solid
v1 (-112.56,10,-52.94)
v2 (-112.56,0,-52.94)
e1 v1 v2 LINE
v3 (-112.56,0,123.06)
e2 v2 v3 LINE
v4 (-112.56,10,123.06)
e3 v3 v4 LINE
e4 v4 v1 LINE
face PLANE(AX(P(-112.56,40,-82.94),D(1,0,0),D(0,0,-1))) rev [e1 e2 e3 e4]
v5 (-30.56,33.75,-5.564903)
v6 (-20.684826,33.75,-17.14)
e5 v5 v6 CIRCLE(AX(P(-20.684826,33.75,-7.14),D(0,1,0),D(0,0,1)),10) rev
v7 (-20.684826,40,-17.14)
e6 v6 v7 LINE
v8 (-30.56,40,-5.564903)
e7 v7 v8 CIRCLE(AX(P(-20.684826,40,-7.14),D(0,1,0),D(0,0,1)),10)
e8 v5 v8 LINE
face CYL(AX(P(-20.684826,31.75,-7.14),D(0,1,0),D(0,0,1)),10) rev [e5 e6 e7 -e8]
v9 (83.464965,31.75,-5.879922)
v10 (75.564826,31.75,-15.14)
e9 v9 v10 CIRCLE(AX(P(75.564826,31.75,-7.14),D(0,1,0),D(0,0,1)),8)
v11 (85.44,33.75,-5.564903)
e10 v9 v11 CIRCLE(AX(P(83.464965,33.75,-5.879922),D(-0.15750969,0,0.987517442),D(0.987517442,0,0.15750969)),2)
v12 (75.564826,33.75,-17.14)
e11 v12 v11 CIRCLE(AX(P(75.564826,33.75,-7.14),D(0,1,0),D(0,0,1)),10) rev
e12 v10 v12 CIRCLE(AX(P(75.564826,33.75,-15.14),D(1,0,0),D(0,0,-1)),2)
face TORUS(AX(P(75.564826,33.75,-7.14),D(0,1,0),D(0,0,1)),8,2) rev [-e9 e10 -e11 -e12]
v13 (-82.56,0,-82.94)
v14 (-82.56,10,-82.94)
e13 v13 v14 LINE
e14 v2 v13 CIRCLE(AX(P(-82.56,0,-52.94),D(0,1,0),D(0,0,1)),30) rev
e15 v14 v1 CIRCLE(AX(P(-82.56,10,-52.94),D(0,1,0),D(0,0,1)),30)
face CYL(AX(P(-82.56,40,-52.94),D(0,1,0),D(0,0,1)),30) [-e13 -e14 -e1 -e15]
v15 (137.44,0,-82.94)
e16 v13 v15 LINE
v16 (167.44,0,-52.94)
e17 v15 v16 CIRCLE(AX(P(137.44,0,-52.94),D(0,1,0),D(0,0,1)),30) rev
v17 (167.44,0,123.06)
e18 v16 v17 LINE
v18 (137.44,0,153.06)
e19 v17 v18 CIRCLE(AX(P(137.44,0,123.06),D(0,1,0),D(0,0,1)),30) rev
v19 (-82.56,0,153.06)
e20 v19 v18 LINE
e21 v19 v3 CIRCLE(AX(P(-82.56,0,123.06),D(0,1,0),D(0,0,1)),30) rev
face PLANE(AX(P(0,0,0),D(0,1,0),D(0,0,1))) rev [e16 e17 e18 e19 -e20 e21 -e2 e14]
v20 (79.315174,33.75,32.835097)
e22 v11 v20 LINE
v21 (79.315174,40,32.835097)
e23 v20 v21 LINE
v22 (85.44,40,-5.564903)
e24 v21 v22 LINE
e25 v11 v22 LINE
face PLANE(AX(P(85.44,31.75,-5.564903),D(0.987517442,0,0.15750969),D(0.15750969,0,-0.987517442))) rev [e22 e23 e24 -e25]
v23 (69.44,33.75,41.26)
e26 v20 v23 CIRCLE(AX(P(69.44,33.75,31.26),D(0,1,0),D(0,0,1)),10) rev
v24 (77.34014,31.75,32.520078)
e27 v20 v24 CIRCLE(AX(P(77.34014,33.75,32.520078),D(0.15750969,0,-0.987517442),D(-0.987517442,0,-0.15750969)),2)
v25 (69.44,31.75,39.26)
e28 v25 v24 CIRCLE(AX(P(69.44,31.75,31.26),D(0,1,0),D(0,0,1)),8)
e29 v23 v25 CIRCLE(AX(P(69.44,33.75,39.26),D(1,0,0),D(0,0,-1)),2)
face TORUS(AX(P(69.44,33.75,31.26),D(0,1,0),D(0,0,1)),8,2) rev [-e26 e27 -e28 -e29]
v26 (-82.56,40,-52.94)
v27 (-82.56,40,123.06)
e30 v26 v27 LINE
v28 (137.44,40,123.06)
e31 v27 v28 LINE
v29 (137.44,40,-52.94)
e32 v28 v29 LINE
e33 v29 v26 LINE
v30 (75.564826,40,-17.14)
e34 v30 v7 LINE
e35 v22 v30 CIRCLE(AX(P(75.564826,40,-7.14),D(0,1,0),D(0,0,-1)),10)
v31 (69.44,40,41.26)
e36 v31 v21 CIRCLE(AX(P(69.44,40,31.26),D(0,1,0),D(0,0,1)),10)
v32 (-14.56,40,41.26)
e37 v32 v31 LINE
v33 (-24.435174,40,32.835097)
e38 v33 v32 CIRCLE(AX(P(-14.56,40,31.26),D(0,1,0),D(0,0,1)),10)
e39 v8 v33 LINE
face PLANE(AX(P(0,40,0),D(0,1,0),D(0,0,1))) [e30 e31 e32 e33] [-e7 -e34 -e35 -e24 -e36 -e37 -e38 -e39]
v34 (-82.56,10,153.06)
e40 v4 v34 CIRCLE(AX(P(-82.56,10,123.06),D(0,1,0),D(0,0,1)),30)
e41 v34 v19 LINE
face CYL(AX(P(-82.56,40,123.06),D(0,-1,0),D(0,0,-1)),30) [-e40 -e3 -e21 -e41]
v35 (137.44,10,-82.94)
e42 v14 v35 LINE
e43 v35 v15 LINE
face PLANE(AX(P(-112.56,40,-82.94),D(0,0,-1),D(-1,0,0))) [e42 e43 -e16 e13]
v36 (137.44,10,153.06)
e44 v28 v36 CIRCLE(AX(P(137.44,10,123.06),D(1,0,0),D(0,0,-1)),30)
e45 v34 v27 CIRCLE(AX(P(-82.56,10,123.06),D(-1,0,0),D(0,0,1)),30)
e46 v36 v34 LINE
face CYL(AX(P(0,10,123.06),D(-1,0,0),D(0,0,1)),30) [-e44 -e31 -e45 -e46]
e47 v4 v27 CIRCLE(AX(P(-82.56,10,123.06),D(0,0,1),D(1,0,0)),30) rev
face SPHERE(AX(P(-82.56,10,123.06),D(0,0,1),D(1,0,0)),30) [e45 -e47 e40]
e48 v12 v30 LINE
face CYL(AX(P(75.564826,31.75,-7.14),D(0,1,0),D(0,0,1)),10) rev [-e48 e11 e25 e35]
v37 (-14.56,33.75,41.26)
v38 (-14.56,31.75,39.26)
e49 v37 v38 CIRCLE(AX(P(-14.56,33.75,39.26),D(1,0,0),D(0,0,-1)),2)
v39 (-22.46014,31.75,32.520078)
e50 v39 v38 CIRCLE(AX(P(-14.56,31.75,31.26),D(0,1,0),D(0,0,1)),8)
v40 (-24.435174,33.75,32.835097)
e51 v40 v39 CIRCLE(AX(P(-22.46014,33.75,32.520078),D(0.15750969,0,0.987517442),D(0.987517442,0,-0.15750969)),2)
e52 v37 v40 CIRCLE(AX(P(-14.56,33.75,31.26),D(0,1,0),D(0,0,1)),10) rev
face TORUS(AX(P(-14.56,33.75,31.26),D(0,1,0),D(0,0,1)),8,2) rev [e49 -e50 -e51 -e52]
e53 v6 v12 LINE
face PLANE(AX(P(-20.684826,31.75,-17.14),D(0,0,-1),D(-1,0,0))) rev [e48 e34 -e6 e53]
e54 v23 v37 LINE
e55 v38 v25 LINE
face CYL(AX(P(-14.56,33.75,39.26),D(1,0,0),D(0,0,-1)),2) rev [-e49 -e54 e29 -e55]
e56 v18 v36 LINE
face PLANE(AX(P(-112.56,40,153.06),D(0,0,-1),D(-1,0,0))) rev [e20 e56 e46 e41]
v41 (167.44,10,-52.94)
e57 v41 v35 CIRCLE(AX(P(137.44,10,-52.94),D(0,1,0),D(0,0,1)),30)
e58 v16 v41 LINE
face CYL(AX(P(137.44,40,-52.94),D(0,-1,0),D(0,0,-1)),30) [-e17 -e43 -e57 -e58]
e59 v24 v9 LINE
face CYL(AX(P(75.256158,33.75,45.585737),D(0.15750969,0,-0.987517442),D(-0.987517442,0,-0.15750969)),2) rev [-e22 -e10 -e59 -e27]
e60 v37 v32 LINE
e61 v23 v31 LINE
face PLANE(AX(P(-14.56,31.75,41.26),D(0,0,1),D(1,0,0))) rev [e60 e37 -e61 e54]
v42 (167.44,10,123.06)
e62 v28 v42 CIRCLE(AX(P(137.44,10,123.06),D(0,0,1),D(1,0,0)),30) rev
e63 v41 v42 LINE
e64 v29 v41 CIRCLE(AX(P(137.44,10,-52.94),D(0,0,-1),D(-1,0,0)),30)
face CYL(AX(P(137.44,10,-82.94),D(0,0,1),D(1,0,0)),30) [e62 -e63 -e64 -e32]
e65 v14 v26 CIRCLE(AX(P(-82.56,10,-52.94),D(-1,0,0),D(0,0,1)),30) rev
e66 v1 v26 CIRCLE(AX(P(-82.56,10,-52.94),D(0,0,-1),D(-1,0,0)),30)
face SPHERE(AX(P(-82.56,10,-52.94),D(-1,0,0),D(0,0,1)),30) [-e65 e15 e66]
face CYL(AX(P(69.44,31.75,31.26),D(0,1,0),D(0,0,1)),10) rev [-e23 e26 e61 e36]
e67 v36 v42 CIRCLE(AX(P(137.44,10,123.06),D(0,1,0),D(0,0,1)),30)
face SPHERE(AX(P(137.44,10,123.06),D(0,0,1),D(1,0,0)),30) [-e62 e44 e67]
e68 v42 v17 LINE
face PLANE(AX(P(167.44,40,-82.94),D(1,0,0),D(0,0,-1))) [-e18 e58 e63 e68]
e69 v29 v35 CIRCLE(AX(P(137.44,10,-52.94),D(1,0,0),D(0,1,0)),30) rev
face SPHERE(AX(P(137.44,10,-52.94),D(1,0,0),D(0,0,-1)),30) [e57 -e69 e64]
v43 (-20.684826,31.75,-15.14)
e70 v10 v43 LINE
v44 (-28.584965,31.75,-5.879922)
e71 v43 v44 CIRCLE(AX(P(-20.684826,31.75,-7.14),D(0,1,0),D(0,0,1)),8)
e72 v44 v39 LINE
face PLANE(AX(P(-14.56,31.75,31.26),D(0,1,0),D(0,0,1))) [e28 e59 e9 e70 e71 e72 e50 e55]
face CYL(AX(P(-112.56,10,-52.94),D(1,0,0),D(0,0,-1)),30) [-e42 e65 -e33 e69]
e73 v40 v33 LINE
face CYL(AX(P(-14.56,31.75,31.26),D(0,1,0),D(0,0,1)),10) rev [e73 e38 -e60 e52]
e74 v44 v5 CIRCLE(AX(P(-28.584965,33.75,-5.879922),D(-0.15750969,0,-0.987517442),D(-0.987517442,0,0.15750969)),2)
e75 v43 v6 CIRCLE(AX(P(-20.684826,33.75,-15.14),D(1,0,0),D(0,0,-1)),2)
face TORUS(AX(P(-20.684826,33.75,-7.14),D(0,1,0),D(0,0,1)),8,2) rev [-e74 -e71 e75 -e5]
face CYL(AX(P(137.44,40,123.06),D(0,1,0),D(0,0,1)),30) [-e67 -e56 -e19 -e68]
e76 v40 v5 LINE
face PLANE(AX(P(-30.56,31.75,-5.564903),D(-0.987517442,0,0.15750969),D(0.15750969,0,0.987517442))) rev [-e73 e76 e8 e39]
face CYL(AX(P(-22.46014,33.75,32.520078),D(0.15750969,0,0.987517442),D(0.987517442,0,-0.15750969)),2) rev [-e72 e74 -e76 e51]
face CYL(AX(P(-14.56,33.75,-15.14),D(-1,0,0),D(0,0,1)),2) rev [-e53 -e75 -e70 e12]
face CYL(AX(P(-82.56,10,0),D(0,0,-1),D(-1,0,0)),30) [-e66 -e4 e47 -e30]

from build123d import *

# Parameters (mm, degrees)
SKETCH1_W           = 280
SKETCH1_H           = 236
BOSS_EXTRUDE1_DEPTH = 40
FILLET1_R           = 30
CUT_EXTRUDE2_DEPTH  = 8.25
FILLET2_R           = 2


with BuildPart() as part:
    # Sketch1 → Boss-Extrude1 (new body)
    with BuildSketch(Plane(origin=(0, 0, 0), x_dir=(1, 0, 0), z_dir=(0, 1, 0))):
        with Locations((27.44, -35.06)):
            Rectangle(SKETCH1_W, SKETCH1_H)
    extrude(amount=BOSS_EXTRUDE1_DEPTH)

    # Fillet1
    fillet1_edges = [part.edges().sort_by_distance(p)[0] for p in [
        (167.44, 40, 35.06),
        (27.44, 40, -82.94),
        (-112.56, 40, 35.06),
        (-112.56, 20, -82.94),
        (167.44, 20, -82.94),
        (167.44, 20, 153.06),
        (-112.56, 20, 153.06),
        (27.44, 40, 153.06),
    ]]
    fillet(fillet1_edges, radius=FILLET1_R)

    # Sketch3 → Cut-Extrude2 (cut)
    with BuildSketch(Plane(origin=(0, 40, 0), x_dir=(1, 0, 0), z_dir=(0, 1, 0))):
        with BuildLine():
            Line((-20.684825583, 17.14), (75.564825583, 17.14))
            ThreePointArc((75.564825583, 17.14), (83.172419453, 13.630340169), (85.44, 5.564903101))
            Line((85.44, 5.564903101), (79.315174417, -32.835096899))
            ThreePointArc((79.315174417, -32.835096899), (75.930340169, -38.86759387), (69.44, -41.26))
            Line((69.44, -41.26), (-14.56, -41.26))
            ThreePointArc((-14.56, -41.26), (-21.050340169, -38.86759387), (-24.435174417, -32.835096899))
            Line((-24.435174417, -32.835096899), (-30.56, 5.564903101))
            ThreePointArc((-30.56, 5.564903101), (-28.292419453, 13.630340169), (-20.684825583, 17.14))
        make_face()
    extrude(amount=-CUT_EXTRUDE2_DEPTH, mode=Mode.SUBTRACT)

    # Fillet2
    fillet2_edges = [part.edges().sort_by_distance(p)[0] for p in [
        (-21.050340169, 31.75, 38.86759387),
        (-27.497587208, 31.75, 13.635096899),
        (-28.292419453, 31.75, -13.630340169),
        (27.44, 31.75, -17.14),
        (83.172419453, 31.75, -13.630340169),
        (82.377587208, 31.75, 13.635096899),
        (75.930340169, 31.75, 38.86759387),
        (27.44, 31.75, 41.26),
    ]]
    fillet(fillet2_edges, radius=FILLET2_R)


solid = part.part
